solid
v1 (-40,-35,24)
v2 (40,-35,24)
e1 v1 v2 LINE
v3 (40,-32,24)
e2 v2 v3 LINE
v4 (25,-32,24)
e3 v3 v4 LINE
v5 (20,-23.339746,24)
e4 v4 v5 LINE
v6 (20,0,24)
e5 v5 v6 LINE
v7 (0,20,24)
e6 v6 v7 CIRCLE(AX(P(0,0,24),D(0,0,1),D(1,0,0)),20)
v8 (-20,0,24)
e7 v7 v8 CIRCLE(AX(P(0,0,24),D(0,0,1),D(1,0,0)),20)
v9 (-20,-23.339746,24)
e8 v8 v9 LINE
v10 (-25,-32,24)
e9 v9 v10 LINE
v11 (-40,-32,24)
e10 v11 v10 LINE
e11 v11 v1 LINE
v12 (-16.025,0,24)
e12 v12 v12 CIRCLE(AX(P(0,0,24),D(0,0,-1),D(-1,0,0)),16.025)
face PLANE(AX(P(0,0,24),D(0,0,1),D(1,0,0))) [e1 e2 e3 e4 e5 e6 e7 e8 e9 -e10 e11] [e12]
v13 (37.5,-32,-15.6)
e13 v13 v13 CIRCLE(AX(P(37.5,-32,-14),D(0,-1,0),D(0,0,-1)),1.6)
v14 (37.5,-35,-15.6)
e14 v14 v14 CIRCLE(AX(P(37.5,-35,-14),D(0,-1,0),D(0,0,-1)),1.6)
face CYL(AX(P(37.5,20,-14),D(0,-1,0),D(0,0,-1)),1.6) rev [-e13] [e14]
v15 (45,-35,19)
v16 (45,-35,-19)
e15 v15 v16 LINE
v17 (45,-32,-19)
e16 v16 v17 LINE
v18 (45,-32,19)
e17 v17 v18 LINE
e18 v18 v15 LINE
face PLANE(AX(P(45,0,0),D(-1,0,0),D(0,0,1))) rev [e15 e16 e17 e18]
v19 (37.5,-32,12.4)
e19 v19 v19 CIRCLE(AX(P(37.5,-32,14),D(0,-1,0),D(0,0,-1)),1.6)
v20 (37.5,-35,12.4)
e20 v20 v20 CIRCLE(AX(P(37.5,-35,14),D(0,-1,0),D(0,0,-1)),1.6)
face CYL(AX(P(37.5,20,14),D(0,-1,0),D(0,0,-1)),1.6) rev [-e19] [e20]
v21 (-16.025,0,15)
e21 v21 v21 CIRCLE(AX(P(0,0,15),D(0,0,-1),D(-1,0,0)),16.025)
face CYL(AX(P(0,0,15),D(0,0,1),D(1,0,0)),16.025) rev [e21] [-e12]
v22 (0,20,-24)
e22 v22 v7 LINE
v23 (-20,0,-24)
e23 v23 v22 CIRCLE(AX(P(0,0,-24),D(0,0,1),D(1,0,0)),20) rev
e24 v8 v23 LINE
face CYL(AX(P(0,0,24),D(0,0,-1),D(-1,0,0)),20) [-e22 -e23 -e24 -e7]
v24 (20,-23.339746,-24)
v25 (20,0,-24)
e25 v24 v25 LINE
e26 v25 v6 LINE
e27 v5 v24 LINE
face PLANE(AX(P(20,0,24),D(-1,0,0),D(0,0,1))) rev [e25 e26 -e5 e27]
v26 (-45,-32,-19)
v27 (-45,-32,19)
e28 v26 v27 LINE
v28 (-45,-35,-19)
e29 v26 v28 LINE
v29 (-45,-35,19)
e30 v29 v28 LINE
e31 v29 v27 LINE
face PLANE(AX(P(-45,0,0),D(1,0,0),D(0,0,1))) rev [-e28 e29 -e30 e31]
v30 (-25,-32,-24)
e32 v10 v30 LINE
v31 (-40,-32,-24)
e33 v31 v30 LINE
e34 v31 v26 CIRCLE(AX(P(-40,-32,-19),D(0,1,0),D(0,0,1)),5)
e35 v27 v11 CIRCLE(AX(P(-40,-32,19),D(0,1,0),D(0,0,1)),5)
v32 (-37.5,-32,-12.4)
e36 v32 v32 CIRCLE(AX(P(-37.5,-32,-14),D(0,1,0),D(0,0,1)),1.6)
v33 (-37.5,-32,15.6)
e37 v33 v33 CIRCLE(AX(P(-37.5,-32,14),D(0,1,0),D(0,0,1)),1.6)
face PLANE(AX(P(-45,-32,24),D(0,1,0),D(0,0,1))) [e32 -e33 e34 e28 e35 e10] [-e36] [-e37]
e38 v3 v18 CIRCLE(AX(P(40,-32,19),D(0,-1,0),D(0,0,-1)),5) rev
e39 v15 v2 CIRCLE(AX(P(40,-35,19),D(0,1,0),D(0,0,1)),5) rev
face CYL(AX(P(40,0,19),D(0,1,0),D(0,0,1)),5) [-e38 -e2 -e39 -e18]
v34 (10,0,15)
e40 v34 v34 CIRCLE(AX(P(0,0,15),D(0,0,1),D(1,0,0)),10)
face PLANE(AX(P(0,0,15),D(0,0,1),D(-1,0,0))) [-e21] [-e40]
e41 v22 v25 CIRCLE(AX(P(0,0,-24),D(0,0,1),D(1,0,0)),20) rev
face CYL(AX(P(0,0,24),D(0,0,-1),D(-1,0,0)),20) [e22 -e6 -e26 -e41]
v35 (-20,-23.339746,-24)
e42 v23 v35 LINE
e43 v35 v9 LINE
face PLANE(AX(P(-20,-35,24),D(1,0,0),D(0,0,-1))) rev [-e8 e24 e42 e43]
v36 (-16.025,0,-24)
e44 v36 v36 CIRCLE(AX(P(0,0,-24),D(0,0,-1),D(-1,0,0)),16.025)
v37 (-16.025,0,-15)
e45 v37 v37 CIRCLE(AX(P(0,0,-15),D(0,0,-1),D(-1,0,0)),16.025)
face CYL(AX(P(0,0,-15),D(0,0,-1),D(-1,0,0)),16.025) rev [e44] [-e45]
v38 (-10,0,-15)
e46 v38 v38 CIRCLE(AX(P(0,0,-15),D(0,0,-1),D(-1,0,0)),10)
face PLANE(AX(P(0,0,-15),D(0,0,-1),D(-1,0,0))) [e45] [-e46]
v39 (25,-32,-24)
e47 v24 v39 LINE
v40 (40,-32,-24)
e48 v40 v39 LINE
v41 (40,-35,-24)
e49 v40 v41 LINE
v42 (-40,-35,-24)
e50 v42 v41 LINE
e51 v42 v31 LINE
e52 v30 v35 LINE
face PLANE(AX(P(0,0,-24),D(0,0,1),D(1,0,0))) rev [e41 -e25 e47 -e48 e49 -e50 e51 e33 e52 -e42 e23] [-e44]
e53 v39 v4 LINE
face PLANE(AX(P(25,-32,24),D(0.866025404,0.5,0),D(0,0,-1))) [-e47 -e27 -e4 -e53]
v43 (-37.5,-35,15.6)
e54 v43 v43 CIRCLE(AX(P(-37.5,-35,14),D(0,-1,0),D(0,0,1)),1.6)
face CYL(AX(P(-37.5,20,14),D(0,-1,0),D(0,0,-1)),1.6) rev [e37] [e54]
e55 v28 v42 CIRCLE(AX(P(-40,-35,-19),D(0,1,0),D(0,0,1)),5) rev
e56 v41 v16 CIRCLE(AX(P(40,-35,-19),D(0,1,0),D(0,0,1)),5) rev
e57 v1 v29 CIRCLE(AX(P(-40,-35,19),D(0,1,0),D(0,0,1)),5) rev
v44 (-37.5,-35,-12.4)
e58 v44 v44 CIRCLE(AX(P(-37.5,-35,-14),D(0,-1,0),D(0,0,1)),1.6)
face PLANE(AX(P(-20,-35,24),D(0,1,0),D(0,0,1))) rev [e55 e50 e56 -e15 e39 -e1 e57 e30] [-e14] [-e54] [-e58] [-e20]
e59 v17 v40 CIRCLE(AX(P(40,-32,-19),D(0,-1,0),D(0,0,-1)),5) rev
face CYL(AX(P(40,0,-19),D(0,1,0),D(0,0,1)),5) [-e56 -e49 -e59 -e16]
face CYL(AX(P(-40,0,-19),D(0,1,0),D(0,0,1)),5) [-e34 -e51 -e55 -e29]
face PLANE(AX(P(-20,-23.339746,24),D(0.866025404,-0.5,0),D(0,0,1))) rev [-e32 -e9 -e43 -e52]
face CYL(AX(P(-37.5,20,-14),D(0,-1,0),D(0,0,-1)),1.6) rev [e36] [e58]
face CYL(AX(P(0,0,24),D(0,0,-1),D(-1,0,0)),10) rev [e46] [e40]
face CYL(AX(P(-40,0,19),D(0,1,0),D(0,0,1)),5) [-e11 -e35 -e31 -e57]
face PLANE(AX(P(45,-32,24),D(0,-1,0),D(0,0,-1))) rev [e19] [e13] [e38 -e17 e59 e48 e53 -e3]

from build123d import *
from OCP.BRepFilletAPI import BRepFilletAPI_MakeChamfer

# Parameters (mm, degrees)
SKETCH_1_R          = 10
EXTRUDE_1_DEPTH     = 24
SKETCH_4_R          = 16.025
CUT_EXTRUDE_3_DEPTH = 9
SKETCH_5_W          = 48
SKETCH_5_H          = 3
EXTRUDE_2_DEPTH     = 25
CHAMFER_1_SIZE      = 5
CHAMFER_1_SIZE2     = 8.660254038
SKETCH_7_R          = 1.6
CUT_EXTRUDE_4_DEPTH = 76.00666637
FILLET_1_R          = 20
FILLET_2_R          = 5


with BuildPart() as part:
    # 草图1 → 凸台-拉伸1 (new, symmetric)
    with BuildSketch(Plane.XY):
        Polygon((-20, -35), (-20, 0), (-20, 20), (20, 20), (20, 0), (20, -35), align=None)
        Circle(SKETCH_1_R, mode=Mode.SUBTRACT)
    extrude(amount=EXTRUDE_1_DEPTH, both=True)

    # 草图4 → 切除-拉伸3 (cut)
    with BuildSketch(Plane(origin=(0, 0, -24), x_dir=(-1, 0, 0), z_dir=(0, 0, -1))):
        Circle(SKETCH_4_R)
    cut_extrude_3 = extrude(amount=-CUT_EXTRUDE_3_DEPTH, mode=Mode.SUBTRACT)

    # 镜向1: 切除-拉伸3 across plane
    add(cut_extrude_3.mirror(Plane.XY), mode=Mode.SUBTRACT)

    # 草图5 → 凸台-拉伸2 (add)
    with BuildSketch(Plane(origin=(20, 0, 0), x_dir=(0, 0, -1), z_dir=(1, 0, 0))):
        with Locations((0, -33.5)):
            Rectangle(SKETCH_5_W, SKETCH_5_H)
    extrude_2 = extrude(amount=EXTRUDE_2_DEPTH)

    # 镜向2: 凸台-拉伸2 across plane
    add(extrude_2.mirror(Plane.ZY))

    # 倒角1: one chamfer whose edges measure the first distance from different faces: ONE call of the kernel's chamfer builder (chamfer() names one face for all edges)
    chamfer_1_edges_1 = [part.edges().sort_by_distance(p)[0] for p in [
        (20, -32, 0),
    ]]
    chamfer_1_side_1 = [part.faces().sort_by_distance(p)[0] for p in [
        (32.5, -32, 0),
    ]]
    chamfer_1_edges_2 = [part.edges().sort_by_distance(p)[0] for p in [
        (-20, -32, 0),
    ]]
    chamfer_1_side_2 = [part.faces().sort_by_distance(p)[0] for p in [
        (-32.5, -32, 0),
    ]]
    chamfer_1 = BRepFilletAPI_MakeChamfer(part.part.solid().wrapped)
    for e in chamfer_1_edges_1:
        chamfer_1.Add(CHAMFER_1_SIZE, CHAMFER_1_SIZE2, e.wrapped, chamfer_1_side_1[0].wrapped)  # the first distance lies on this face
    for e in chamfer_1_edges_2:
        chamfer_1.Add(CHAMFER_1_SIZE, CHAMFER_1_SIZE2, e.wrapped, chamfer_1_side_2[0].wrapped)  # the first distance lies on this face
    add(Compound.cast(chamfer_1.Shape()), mode=Mode.REPLACE)

    # 草图7 → 切除-拉伸4 (cut, through all)
    with BuildSketch(Plane.XZ.offset(35)):
        with Locations(Location((37.5, 14, 0), (0, 0, 270))):
            Circle(SKETCH_7_R)
        with Locations(Location((37.5, -14, 0), (0, 0, 270))):
            Circle(SKETCH_7_R)
        with Locations(Location((-37.5, 14, 0), (0, 0, 90))):
            Circle(SKETCH_7_R)
        with Locations(Location((-37.5, -14, 0), (0, 0, 90))):
            Circle(SKETCH_7_R)
    extrude(amount=-CUT_EXTRUDE_4_DEPTH, mode=Mode.SUBTRACT)

    # 圆角1
    fillet_1_edges = [part.edges().sort_by_distance(p)[0] for p in [
        (20, 20, 0),
        (-20, 20, 0),
    ]]
    fillet(fillet_1_edges, radius=FILLET_1_R - 0.0001)  # a hair under: the kernel refuses the full size

    # 圆角2
    fillet_2_edges = [part.edges().sort_by_distance(p)[0] for p in [
        (45, -33.5, 24),
        (45, -33.5, -24),
        (-45, -33.5, 24),
        (-45, -33.5, -24),
    ]]
    fillet(fillet_2_edges, radius=FILLET_2_R)


solid = part.part
